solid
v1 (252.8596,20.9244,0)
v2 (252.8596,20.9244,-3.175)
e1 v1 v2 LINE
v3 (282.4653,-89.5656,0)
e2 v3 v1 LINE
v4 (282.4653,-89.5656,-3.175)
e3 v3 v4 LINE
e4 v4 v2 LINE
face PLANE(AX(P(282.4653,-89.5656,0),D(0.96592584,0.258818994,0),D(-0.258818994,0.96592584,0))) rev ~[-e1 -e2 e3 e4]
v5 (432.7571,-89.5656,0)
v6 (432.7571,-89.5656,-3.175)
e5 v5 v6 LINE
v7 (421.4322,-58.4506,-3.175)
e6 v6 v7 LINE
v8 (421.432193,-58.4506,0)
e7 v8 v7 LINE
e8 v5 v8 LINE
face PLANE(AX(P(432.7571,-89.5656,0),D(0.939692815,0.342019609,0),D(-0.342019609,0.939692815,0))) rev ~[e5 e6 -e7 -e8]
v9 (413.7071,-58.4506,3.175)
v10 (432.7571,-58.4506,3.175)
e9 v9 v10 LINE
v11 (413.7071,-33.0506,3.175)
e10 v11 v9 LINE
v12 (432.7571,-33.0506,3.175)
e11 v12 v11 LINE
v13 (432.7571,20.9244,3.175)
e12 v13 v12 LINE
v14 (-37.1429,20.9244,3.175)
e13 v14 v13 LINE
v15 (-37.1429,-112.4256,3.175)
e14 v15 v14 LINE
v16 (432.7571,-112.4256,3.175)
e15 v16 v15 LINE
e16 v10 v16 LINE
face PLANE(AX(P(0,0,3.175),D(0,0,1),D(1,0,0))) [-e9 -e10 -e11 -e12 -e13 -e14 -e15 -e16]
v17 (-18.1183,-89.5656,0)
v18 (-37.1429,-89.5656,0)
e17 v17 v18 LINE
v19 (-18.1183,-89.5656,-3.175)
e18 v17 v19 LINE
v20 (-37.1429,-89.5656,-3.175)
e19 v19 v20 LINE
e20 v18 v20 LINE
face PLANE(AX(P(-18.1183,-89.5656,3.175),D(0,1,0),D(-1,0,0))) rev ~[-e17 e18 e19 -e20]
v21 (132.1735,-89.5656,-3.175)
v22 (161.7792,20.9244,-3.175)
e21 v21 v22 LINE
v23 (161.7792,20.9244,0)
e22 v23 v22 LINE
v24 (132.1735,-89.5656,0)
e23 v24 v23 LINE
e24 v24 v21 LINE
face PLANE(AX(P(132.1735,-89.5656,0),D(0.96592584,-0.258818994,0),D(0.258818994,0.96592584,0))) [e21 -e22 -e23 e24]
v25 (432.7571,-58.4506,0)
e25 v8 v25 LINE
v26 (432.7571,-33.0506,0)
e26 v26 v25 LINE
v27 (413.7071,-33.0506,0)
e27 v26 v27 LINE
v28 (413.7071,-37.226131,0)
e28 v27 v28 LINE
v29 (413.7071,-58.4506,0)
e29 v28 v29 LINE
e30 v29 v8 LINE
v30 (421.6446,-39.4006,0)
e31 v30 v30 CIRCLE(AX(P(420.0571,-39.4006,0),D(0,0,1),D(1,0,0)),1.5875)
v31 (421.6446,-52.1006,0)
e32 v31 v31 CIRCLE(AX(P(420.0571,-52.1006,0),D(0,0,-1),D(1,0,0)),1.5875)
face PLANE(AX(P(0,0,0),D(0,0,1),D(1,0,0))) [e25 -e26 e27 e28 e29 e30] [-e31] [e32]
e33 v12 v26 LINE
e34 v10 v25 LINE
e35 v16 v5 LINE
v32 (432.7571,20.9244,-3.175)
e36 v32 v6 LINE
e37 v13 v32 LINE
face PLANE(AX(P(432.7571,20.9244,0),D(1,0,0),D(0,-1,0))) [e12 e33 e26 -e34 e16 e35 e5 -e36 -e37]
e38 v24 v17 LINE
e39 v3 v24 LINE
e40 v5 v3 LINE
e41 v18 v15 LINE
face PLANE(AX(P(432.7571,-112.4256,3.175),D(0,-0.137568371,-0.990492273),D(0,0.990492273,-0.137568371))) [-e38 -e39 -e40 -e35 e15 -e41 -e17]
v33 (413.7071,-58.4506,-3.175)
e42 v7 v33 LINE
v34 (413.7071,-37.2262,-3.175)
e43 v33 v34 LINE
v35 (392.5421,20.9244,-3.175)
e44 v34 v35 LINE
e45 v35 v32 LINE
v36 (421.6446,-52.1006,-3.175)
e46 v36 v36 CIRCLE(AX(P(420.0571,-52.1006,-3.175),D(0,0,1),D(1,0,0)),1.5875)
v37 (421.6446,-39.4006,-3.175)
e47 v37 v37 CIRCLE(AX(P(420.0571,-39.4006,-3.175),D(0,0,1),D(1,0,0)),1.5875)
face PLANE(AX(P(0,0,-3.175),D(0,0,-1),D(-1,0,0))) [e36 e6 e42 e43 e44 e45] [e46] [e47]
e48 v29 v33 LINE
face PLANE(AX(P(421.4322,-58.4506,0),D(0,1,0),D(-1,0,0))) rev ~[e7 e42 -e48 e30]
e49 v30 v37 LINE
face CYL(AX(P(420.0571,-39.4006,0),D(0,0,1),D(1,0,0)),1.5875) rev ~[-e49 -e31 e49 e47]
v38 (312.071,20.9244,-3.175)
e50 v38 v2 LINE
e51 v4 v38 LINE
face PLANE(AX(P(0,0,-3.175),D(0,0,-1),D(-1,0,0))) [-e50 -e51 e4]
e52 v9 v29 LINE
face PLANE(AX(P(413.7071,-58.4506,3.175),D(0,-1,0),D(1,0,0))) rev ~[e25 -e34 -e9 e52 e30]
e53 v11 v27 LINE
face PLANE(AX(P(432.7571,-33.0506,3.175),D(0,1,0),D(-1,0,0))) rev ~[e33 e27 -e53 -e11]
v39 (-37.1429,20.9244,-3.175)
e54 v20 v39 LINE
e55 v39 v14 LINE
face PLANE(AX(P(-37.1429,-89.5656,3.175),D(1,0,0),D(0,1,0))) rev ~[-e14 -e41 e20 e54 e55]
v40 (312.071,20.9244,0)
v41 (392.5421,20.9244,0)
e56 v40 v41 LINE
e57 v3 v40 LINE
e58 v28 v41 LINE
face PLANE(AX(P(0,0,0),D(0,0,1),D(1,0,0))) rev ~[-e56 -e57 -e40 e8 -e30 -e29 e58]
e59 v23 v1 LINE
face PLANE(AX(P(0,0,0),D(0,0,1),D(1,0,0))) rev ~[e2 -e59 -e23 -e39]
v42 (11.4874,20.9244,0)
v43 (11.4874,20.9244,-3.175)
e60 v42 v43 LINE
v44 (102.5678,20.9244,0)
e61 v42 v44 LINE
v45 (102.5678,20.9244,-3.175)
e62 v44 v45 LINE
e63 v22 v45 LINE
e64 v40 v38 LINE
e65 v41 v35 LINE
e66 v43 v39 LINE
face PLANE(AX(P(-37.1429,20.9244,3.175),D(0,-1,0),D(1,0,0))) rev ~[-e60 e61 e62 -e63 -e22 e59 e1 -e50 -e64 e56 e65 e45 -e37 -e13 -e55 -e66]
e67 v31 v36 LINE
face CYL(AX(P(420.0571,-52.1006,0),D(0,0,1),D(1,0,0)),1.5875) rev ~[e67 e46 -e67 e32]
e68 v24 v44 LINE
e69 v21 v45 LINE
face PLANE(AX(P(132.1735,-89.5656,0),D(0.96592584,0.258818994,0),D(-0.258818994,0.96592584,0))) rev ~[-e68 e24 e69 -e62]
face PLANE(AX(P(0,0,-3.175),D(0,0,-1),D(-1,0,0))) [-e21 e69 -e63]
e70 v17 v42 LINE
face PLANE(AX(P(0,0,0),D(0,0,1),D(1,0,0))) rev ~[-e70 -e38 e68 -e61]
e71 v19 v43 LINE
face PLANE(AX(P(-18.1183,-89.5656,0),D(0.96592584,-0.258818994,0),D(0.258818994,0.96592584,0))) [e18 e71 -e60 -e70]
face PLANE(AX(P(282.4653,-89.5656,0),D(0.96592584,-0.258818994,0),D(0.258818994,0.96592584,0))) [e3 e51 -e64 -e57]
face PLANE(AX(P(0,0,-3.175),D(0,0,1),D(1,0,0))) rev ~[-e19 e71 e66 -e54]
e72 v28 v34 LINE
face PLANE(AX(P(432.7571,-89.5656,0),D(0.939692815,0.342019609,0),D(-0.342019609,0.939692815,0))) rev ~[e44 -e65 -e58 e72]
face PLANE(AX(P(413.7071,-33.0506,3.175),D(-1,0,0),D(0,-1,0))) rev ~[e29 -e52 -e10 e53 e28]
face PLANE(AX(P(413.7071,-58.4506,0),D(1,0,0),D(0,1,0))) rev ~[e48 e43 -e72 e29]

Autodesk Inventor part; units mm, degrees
ref_plane "YZ Plane" through (0, 0, 0) normal (1, 0, 0) x (0, 1, 0)
ref_plane "XZ Plane" through (0, 0, 0) normal (0, 1, 0) x (-1, 0, 0)
ref_plane "XY Plane" through (0, 0, 0) normal (0, 0, 1) x (1, 0, 0)
sketch "Sketch1" plane through (0, 0, 0) normal (0, 0, 1) x (1, 0, 0)
  line L0 (-37.1429, 20.9244) -> (432.7571, 20.9244)
  line L1 (432.7571, 20.9244) -> (432.7571, -112.4256)
  line L2 (432.7571, -112.4256) -> (-37.1429, -112.4256)
  line L3 (-37.1429, -112.4256) -> (-37.1429, 20.9244)
  point P0 (0, 0)
  dimension "d0" = 469.9
  dimension "d1" = 133.35
extrude "Extrusion1" add sketch "Sketch1" along normal blind 3.175
sketch "Sketch2" plane through (432.7571, -112.4256, 0) normal (1, 0, 0) x (0, 0, -1)
  line L0 (0, 133.35) -> (0, 0) projected
  line L1 (-3.175, 133.35) -> (0, 107.95)
  line L2 (-3.175, 0) -> (0, 22.86)
  line L3 (-3.175, 0) -> (0, 0)
  line L4 (0, 22.86) -> (0, 0)
  point P0 (0, 112.4256)
  dimension "d4" = 25.4
  dimension "d5" = 22.86
extrude "Extrusion3" cut sketch "Sketch2" against normal blind 476.25
sketch "Sketch4" plane through (0, 0, 0) normal (0, 0, -1) x (-1, 0, 0)
  line L0 (-432.7571, -89.5656) -> (37.1429, -89.5656) projected
  line L1 (37.1429, 20.9244) -> (-432.7571, 20.9244) projected
  line L2 (-432.7571, 20.9244) -> (-432.7571, -89.5656) projected
  line L3 (-432.7571, -89.5656) -> (37.1429, -89.5656)
  line L4 (37.1429, -89.5656) -> (37.1429, 20.9244)
  line L5 (37.1429, 20.9244) -> (-432.7571, 20.9244)
  line L6 (-432.7571, 20.9244) -> (-432.7571, -89.5656)
  line L7 (-282.4653, -89.5656) -> (-282.4653, 20.9244)
  line L8 (-132.1735, -89.5656) -> (-132.1735, 20.9244)
  line L9 (18.1183, -89.5656) -> (18.1183, 20.9244)
  line L10 (-282.4653, -89.5656) -> (-312.071, 20.9244)
  line L11 (-432.7571, -89.5656) -> (-392.5421, 20.9244)
  line L12 (-282.4653, -89.5656) -> (-252.8596, 20.9244)
  line L13 (-132.1735, -89.5656) -> (-161.7792, 20.9244)
  line L14 (-132.1735, -89.5656) -> (-102.5678, 20.9244)
  line L15 (18.1183, -89.5656) -> (-11.4874, 20.9244)
  line L16 (18.1183, 20.9244) -> (37.1429, 20.9244)
  line L17 (37.1429, 20.9244) -> (37.1429, -89.5656)
  line L18 (37.1429, -89.5656) -> (18.1183, -89.5656)
  line L19 (18.1183, -89.5656) -> (18.1183, 20.9244)
  point P0 (0, 0)
  dimension "d10" = 150.2918
  dimension "d11" = 150.2918
  dimension "d12" = 150.2918
  dimension "d13" = 20
  dimension "d14" = 15
  dimension "d15" = 15
extrude "Extrusion4" add sketch "Sketch4" along normal blind 3.175 contours L2 L1 L11 | L10 L1 L7 | L7 L1 L12 | L13 L1 L8 | L8 L1 L14 | L15 L1 L9
sketch "Sketch5" plane through (0, 0, 0) normal (0, 0, -1) x (-1, 0, 0)
  line L0 (18.1183, 20.9244) -> (18.1183, -89.5656) projected
  line L1 (18.1183, -89.5656) -> (37.1429, -89.5656) projected
  line L2 (37.1429, -89.5656) -> (37.1429, 20.9244) projected
  line L3 (37.1429, 20.9244) -> (18.1183, 20.9244) projected
  line L4 (18.1183, 20.9244) -> (37.1429, 20.9244)
  line L5 (37.1429, 20.9244) -> (37.1429, -89.5656)
  line L6 (37.1429, -89.5656) -> (18.1183, -89.5656)
  line L7 (18.1183, -89.5656) -> (18.1183, 20.9244)
  point P0 (0, 0)
sketch "Sketch6" plane through (0, 0, 3.175) normal (0, 0, 1) x (1, 0, 0)
  line L0 (-37.1429, 20.9244) -> (-18.1183, 20.9244)
  line L1 (-18.1183, 20.9244) -> (-18.1183, -89.5656)
  line L2 (-18.1183, -89.5656) -> (-37.1429, -89.5656)
  line L3 (-37.1429, -89.5656) -> (-37.1429, 20.9244)
  point P0 (0, 0)
  dimension "d18" = 110.49
  dimension "d19" = 19.0246
extrude "Extrusion5" add sketch "Sketch6" against normal blind 6.35
sketch "Sketch9" plane through (0, 0, 3.175) normal (0, 0, 1) x (1, 0, 0)
  line L0 (432.7571, 20.9244) -> (432.7571, -112.4256) projected
  line L1 (432.7571, -33.0506) -> (413.7071, -33.0506)
  line L2 (413.7071, -33.0506) -> (413.7071, -58.4506)
  line L3 (413.7071, -58.4506) -> (432.7571, -58.4506)
  line L4 (432.7571, -58.4506) -> (432.7571, -33.0506)
  point P0 (0, 0)
  dimension "d38" = 25.4
  dimension "d39" = 19.05
  dimension "d40" = 53.975
extrude "Extrusion8" cut sketch "Sketch9" against normal blind 3.175
sketch "Sketch10" plane through (0, 0, 0) normal (0, 0, 1) x (1, 0, 0)
  line L0 (413.7071, -37.2262) -> (421.4322, -58.4506) projected
  line L1 (432.7571, -33.0506) -> (413.7071, -33.0506) projected
  line L2 (413.7071, -33.0506) -> (413.7071, -37.2262) projected
  line L3 (413.7071, -37.2262) -> (421.4322, -58.4506)
  line L4 (413.7071, -58.4506) -> (413.7071, -37.2262)
  line L5 (421.4322, -58.4506) -> (413.7071, -58.4506)
  circle A0 centre (420.0571, -39.4006) radius 1.5875
  circle A1 centre (420.0571, -52.1006) radius 1.5875
  point P0 (0, 0)
  dimension "d43" = 12.7
  dimension "d44" = 6.35
  dimension "d45" = 3.175
  dimension "d46" = 3.175
  dimension "d47" = 6.35
extrude "Extrusion9" add sketch "Sketch10" against normal blind 3.175 contours L0 A1 L5 L4 | L0 A1 picked at (419.0163, -52.1007)
extrude "Extrusion10" cut sketch "Sketch10" against normal blind 3.175 contours A1 L0 | L0 A1 | A0
properties part number "bottom panel left"
